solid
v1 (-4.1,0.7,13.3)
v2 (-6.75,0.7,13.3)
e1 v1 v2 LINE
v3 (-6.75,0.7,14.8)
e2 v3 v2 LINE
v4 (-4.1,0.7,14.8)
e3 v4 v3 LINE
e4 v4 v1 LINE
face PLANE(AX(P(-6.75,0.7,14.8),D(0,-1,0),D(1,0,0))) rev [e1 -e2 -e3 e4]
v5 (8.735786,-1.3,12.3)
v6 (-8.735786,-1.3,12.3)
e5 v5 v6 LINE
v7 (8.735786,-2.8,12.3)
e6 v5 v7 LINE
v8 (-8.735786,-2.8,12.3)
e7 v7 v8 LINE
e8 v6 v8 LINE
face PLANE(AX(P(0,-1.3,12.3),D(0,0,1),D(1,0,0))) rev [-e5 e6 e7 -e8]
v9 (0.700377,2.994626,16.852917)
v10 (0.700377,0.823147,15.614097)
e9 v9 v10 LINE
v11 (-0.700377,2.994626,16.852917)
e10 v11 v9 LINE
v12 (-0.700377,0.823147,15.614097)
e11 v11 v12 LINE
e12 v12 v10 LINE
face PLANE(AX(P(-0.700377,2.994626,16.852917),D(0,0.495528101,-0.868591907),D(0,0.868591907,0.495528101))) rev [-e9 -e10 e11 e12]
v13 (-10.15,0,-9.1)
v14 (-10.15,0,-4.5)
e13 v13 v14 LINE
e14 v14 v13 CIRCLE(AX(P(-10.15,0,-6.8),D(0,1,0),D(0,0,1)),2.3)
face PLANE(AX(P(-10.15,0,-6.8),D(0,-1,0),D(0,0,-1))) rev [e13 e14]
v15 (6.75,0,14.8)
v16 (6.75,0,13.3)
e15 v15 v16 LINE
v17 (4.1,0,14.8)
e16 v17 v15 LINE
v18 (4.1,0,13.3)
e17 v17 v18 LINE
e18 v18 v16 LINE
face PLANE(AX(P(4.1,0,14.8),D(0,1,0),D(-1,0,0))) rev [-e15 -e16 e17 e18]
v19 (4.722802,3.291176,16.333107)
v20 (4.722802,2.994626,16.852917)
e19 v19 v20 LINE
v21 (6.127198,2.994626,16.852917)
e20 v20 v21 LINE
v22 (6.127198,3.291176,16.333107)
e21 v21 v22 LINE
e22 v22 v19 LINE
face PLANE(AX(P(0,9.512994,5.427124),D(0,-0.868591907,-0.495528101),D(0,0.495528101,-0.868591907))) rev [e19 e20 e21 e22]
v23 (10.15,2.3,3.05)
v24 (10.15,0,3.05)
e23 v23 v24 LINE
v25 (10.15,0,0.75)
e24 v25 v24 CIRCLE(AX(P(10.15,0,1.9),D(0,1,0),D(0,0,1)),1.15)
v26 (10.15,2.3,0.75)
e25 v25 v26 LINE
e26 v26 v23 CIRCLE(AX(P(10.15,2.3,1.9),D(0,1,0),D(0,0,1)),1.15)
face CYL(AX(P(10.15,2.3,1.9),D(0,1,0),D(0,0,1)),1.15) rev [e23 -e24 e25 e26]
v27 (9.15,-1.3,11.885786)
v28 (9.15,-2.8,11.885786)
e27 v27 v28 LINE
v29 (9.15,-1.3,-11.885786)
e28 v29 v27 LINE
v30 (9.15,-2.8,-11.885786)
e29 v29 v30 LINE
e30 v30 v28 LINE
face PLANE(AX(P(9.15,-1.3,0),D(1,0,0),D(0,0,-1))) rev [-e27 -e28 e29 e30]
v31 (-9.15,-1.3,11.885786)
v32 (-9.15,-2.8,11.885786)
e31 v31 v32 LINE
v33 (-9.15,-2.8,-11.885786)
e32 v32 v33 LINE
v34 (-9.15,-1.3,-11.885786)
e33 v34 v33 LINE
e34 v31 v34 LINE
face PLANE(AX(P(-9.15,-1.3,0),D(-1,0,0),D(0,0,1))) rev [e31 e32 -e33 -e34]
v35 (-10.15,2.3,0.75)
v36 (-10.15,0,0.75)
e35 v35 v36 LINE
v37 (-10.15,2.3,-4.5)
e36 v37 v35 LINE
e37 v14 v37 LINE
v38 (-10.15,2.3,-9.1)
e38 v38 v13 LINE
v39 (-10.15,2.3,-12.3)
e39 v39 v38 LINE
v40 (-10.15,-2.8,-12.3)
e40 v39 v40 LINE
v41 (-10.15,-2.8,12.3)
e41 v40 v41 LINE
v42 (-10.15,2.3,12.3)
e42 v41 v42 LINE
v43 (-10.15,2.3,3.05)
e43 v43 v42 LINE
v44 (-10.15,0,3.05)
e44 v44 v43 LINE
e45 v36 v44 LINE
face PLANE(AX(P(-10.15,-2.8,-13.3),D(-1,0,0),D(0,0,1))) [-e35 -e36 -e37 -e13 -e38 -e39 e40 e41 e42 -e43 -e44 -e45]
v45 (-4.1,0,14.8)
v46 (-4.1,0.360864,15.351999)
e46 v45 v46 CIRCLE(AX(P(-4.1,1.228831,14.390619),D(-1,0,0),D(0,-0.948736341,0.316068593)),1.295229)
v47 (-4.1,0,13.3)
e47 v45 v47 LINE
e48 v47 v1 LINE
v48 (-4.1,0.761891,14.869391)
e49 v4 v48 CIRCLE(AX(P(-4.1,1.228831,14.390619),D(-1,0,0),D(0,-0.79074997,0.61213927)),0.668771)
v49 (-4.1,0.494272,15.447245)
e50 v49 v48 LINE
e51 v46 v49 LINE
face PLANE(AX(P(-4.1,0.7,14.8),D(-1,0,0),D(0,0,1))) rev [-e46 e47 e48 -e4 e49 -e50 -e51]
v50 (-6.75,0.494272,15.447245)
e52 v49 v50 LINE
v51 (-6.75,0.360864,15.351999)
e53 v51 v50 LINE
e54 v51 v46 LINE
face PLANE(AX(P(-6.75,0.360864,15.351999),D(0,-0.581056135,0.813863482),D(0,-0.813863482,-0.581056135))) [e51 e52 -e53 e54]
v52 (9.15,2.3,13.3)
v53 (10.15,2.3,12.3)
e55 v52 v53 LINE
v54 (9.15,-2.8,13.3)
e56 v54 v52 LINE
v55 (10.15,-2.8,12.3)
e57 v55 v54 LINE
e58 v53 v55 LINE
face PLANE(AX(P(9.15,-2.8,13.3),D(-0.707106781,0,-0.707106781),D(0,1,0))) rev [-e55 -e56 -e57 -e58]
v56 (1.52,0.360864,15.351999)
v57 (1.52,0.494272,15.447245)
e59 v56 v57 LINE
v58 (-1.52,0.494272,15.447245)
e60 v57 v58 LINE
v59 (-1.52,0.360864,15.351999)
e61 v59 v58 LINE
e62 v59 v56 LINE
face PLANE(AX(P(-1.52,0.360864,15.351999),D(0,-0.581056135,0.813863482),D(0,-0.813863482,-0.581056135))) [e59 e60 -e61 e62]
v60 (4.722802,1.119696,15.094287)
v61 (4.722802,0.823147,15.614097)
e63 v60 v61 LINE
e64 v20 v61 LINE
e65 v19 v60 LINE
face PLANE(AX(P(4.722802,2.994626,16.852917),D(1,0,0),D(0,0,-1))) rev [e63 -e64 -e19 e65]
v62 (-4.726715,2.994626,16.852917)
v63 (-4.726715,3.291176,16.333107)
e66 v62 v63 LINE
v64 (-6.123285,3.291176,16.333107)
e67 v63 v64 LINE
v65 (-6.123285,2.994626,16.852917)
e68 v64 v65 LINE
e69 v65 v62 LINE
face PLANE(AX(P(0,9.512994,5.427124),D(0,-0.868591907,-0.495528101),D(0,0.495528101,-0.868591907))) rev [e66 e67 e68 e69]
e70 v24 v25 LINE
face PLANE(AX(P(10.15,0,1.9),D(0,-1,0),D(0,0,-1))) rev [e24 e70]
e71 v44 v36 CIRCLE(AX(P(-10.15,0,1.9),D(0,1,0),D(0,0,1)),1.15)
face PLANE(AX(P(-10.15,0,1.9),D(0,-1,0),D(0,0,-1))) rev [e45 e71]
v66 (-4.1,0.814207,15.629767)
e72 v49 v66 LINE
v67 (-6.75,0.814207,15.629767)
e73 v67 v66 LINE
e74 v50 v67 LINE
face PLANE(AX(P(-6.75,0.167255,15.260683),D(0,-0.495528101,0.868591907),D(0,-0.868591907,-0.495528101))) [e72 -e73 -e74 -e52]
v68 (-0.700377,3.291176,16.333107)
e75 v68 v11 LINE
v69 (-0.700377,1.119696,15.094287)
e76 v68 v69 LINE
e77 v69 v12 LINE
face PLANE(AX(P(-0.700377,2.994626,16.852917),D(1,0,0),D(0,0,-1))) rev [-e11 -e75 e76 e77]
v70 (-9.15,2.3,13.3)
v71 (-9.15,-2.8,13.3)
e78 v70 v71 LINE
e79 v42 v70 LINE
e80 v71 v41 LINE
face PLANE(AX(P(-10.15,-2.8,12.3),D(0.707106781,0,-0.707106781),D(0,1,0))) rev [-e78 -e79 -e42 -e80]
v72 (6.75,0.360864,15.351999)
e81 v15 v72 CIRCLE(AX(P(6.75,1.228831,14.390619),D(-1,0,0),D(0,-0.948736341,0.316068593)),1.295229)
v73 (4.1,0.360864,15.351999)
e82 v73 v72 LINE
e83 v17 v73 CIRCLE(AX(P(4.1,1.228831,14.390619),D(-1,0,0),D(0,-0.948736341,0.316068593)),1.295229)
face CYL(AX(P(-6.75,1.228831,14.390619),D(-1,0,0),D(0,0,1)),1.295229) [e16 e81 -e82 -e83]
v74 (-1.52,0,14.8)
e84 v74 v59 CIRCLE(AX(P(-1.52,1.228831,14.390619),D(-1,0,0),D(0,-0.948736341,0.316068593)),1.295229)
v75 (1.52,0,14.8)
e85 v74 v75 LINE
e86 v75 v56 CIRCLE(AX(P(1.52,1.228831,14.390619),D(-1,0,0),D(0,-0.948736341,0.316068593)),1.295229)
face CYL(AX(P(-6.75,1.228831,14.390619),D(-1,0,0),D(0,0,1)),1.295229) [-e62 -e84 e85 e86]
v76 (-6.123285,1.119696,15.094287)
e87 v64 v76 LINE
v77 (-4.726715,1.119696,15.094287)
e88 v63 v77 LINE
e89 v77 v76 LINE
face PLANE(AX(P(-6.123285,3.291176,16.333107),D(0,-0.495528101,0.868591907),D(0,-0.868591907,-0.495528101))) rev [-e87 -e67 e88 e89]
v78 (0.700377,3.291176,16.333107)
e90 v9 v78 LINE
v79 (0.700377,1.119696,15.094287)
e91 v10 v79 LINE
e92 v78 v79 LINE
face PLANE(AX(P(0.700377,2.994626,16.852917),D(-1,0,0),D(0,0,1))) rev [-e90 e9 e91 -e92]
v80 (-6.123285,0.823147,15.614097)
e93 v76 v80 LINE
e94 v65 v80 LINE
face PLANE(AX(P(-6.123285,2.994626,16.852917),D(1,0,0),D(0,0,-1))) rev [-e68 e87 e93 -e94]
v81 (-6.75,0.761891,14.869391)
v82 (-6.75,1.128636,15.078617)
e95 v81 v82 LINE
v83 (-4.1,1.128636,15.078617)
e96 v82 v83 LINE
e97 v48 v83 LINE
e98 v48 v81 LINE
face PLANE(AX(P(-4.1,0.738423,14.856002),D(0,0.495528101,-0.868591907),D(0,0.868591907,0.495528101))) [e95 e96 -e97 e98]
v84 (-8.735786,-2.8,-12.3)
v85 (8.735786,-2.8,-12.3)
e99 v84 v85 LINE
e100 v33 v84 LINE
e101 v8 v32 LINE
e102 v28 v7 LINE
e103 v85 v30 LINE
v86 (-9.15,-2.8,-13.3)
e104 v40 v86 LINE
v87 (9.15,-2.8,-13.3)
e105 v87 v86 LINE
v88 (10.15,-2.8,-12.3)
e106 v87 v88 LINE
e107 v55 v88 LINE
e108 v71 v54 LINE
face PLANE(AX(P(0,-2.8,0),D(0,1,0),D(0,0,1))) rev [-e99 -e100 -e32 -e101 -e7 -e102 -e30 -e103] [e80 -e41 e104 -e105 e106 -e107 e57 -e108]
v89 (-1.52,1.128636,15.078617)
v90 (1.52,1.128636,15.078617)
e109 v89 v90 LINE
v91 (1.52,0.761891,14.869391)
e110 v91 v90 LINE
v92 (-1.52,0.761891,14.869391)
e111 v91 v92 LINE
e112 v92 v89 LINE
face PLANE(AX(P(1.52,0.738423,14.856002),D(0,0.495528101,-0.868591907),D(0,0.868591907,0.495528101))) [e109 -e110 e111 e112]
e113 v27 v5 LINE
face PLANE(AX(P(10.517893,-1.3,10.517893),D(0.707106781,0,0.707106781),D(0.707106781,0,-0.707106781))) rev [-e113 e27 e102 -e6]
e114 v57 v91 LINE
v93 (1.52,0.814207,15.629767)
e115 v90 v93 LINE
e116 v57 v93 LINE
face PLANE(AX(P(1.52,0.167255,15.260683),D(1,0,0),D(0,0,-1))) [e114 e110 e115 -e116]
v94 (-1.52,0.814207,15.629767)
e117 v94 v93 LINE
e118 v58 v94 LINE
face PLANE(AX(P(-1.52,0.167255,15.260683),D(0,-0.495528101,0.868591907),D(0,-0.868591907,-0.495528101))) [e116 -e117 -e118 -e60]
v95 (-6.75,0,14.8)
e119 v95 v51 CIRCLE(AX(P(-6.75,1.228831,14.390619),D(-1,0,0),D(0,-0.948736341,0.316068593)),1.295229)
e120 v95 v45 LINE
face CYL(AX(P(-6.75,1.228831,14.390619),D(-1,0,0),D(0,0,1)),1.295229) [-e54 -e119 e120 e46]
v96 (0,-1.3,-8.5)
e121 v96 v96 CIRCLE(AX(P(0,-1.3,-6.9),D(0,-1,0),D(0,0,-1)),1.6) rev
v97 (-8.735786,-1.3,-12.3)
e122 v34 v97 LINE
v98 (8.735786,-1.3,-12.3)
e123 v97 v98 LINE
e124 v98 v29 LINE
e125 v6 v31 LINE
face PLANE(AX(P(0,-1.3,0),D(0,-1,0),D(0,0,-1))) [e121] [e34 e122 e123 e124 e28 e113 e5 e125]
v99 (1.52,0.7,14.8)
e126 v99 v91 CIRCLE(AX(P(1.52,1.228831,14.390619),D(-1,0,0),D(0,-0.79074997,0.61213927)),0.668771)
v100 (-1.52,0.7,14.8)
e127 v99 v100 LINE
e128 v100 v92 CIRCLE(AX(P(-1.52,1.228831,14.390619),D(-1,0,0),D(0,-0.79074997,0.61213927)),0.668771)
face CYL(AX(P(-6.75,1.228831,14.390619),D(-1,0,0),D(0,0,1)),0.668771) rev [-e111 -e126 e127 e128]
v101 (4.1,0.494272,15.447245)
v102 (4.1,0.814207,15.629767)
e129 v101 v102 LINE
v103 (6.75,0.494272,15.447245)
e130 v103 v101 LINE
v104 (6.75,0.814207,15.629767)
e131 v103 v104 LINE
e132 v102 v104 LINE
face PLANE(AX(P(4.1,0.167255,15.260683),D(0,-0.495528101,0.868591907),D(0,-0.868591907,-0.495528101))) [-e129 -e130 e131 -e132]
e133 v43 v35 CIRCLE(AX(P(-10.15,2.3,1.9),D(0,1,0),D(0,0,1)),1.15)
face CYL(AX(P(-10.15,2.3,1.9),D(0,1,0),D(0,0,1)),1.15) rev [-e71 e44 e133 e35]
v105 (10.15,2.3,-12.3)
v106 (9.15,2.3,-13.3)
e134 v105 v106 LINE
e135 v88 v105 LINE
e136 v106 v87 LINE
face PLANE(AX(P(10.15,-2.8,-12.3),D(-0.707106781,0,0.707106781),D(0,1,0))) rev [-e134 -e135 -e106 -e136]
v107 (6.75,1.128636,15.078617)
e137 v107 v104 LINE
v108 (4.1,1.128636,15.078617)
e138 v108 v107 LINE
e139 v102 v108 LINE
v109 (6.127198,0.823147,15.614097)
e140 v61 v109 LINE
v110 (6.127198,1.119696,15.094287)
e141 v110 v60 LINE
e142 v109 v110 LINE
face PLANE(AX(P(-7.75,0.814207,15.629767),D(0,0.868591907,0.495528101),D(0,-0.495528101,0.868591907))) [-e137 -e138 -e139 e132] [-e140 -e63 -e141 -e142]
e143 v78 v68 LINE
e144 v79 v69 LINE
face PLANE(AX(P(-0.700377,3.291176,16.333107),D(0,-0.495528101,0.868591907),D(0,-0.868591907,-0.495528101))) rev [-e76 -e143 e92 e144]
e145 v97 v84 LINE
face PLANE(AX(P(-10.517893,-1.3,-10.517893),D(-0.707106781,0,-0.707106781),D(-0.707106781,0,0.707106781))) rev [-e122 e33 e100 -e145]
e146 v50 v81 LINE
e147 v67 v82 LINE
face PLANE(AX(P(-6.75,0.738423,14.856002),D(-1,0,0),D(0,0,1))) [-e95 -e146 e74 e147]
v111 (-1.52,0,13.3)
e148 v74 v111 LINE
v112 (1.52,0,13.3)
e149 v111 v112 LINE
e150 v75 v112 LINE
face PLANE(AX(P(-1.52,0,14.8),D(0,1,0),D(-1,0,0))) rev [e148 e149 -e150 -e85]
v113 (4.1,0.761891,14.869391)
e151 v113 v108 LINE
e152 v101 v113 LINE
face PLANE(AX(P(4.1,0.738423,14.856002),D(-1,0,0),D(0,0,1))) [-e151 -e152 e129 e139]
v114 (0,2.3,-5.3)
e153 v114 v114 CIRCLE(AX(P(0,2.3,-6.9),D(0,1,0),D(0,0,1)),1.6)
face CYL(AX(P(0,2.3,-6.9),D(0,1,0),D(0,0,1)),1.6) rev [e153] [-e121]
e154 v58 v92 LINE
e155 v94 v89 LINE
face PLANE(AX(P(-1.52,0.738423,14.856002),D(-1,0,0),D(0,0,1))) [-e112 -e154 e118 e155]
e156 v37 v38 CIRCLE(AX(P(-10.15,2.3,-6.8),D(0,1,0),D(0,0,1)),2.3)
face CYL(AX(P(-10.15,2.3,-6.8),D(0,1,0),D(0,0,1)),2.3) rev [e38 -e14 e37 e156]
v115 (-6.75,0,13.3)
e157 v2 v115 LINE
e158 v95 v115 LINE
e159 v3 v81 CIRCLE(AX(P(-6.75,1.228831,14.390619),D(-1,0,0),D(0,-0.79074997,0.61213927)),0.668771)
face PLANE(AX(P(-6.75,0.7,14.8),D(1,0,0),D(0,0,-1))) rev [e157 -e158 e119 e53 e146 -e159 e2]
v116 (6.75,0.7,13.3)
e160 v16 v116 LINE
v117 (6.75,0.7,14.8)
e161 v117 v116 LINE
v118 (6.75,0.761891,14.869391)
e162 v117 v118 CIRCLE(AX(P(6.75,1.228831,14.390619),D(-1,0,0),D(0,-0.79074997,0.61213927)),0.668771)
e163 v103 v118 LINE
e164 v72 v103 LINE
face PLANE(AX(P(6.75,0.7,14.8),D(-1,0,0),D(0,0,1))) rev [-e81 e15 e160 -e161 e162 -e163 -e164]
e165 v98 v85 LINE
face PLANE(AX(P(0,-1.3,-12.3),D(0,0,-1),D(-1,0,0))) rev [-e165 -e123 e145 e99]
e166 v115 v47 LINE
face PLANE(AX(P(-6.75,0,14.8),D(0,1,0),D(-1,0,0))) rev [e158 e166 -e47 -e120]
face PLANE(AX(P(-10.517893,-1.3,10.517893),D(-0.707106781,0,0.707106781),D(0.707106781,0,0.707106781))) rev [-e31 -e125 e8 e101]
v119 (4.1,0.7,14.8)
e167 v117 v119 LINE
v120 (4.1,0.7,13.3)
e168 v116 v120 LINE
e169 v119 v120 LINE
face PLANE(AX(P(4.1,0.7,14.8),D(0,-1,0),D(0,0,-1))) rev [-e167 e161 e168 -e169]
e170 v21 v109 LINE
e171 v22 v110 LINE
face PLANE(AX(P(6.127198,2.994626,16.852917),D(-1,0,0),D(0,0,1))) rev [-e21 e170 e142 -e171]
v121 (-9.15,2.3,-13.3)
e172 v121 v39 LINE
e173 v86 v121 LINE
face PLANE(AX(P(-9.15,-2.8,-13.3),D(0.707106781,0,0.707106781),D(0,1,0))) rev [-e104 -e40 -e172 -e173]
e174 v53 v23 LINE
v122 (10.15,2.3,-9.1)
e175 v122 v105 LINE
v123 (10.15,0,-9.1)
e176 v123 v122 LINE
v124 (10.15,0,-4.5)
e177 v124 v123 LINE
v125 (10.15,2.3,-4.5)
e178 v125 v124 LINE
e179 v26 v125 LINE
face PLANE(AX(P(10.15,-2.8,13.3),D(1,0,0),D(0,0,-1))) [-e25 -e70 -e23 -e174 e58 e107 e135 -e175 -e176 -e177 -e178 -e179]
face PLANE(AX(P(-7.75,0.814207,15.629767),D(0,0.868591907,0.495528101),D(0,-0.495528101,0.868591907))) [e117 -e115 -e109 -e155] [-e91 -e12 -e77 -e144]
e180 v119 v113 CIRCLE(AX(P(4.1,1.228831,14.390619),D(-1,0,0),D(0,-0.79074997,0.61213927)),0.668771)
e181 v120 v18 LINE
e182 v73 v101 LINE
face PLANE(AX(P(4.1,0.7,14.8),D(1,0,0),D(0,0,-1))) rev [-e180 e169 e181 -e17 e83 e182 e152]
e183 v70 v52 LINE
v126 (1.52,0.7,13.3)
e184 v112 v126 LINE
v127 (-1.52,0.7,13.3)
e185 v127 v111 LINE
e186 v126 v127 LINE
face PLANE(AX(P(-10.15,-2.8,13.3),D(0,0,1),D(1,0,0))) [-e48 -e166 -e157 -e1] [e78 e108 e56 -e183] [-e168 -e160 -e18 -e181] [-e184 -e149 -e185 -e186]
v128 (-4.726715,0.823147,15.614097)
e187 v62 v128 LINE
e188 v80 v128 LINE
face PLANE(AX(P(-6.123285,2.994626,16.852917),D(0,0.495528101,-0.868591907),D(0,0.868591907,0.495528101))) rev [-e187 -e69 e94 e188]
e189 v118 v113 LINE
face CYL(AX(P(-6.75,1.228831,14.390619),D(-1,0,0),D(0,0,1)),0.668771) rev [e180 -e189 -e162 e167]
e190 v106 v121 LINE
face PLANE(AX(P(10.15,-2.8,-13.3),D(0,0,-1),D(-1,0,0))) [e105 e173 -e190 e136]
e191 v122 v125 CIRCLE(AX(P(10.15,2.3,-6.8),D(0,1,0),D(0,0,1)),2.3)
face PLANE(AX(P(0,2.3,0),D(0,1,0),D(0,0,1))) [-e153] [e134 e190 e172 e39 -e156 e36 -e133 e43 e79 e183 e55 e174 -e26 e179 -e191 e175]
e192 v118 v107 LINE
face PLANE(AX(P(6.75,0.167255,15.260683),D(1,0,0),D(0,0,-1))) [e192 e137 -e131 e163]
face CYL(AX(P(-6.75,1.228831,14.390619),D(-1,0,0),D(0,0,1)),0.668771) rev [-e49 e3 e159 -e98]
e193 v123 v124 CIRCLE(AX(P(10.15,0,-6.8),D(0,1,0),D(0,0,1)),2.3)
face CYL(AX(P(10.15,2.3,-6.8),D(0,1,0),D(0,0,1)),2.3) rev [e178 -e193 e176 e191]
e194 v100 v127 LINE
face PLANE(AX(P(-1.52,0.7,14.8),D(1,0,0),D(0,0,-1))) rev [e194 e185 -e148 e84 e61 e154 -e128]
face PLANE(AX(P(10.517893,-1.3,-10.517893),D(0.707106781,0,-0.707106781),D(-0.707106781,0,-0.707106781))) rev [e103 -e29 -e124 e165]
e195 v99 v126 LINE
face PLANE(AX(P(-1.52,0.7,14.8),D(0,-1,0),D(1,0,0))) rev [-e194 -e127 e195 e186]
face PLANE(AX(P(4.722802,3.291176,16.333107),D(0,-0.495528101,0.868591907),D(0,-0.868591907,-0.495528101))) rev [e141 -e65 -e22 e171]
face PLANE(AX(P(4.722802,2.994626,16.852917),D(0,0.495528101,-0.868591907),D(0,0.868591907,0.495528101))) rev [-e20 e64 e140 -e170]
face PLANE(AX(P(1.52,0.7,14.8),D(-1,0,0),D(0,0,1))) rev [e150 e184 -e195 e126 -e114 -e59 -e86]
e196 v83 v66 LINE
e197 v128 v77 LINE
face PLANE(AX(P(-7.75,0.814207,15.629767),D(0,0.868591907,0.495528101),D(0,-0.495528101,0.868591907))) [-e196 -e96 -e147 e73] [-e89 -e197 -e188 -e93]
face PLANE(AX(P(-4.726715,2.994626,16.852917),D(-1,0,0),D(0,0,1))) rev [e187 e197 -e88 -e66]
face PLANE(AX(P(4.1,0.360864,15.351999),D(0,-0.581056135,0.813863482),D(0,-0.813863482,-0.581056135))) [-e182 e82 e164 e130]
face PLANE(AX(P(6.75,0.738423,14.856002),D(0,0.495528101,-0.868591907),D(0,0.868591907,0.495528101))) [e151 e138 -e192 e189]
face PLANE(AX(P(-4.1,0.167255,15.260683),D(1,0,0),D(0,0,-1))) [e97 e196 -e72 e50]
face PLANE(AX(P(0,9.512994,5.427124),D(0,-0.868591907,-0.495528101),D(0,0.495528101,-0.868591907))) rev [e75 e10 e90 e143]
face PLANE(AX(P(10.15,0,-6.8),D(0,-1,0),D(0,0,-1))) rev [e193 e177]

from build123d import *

# Parameters (mm, degrees)
SKETCH_1_W                  = 20.3
SKETCH_1_H                  = 26.6
EXTRUDE_1_DEPTH             = 5.1
HOLE_WIZARD_3_2_3_2_1_D     = 3.2
HOLE_WIZARD_2_3_2_3_1_D     = 2.3
HOLE_WIZARD_2_3_2_3_1_DEPTH = 2.3
HOLE_WIZARD_4_6_4_6_1_D     = 4.6
HOLE_WIZARD_4_6_4_6_1_DEPTH = 2.3
CHAMFER_1_SIZE              = 1
SKETCH_20_R                 = 1.6
CUT_EXTRUDE_7_DEPTH         = 1.5
SKETCH_2_W                  = 2.65
SKETCH_2_H                  = 0.7
SKETCH_2_W_2                = 3.04
EXTRUDE_2_DEPTH             = 1.5
SWEEP_START                 = -6.75
SWEEP_1_DEPTH               = 2.65
SWEEP_START_2               = -1.52
SWEEP_2_DEPTH               = 3.04
SWEEP_START_3               = 4.1
SWEEP_3_DEPTH               = 2.65
CUT_EXTRUDE_8_DEPTH         = 1
CUT_EXTRUDE_8_DEPTH_BACK    = 15.5
SKETCH_25_W                 = 1.3965698
SKETCH_25_H                 = 0.598451561
SKETCH_25_W_2               = 1.400753048
SKETCH_25_W_3               = 1.404395486
EXTRUDE_3_DEPTH             = 2.5


# Read off the part's stored shape, not the designer's step: По траектории1, По траектории2, По траектории3
with BuildPart() as part:
    # Эскиз1 → Бобышка-Вытянуть1 (new body)
    with BuildSketch(Plane(origin=(0, 2.3, 0), x_dir=(1, 0, 0), z_dir=(0, 1, 0))):
        Rectangle(SKETCH_1_W, SKETCH_1_H)
    extrude(amount=-EXTRUDE_1_DEPTH)

    # Диаметр отверстия Ø3.2 (3.2)1 (through all)
    with Locations(Plane(origin=(0, 2.3, 0), x_dir=(1, 0, 0), z_dir=(0, 1, 0))):
        with Locations((0, 6.9)):
            Hole(HOLE_WIZARD_3_2_3_2_1_D / 2)

    # Диаметр отверстия Ø2.3 (2.3)1
    with Locations(Plane(origin=(0, 2.3, 0), x_dir=(1, 0, 0), z_dir=(0, 1, 0))):
        with Locations((10.15, -1.9), (-10.15, -1.9)):
            Hole(HOLE_WIZARD_2_3_2_3_1_D / 2, depth=HOLE_WIZARD_2_3_2_3_1_DEPTH)

    # Диаметр отверстия Ø4.6 (4.6)1
    with Locations(Plane(origin=(0, 2.3, 0), x_dir=(1, 0, 0), z_dir=(0, 1, 0))):
        with Locations((10.15, 6.8), (-10.15, 6.8)):
            Hole(HOLE_WIZARD_4_6_4_6_1_D / 2, depth=HOLE_WIZARD_4_6_4_6_1_DEPTH)

    # Фаска1
    chamfer_1_edges = [part.edges().sort_by_distance(p)[0] for p in [
        (-10.15, -0.25, -13.3),
        (10.15, -0.25, -13.3),
        (10.15, -0.25, 13.3),
        (-10.15, -0.25, 13.3),
    ]]
    chamfer(chamfer_1_edges, length=CHAMFER_1_SIZE)

    # Эскиз20 → Вырез-Вытянуть7 (cut)
    with BuildSketch(Plane.XZ.offset(2.8)):
        Polygon((-8.735786438, -12.3), (8.735786438, -12.3), (9.15, -11.885786438), (9.15, 11.885786438), (8.735786438, 12.3), (-8.735786438, 12.3), (-9.15, 11.885786438), (-9.15, -11.885786438), align=None)
        with Locations(Location((0, -6.9, 0), (0, 0, 90))):
            Circle(SKETCH_20_R, mode=Mode.SUBTRACT)
    extrude(amount=-CUT_EXTRUDE_7_DEPTH, mode=Mode.SUBTRACT)

    # Эскиз2 → Бобышка-Вытянуть2 (add)
    with BuildSketch(Plane.XY.offset(13.3)):
        with Locations((-5.425, 0.35)):
            Rectangle(SKETCH_2_W, SKETCH_2_H)
        with Locations((0, 0.35)):
            Rectangle(SKETCH_2_W_2, SKETCH_2_H)
        with Locations((5.425, 0.35)):
            Rectangle(SKETCH_2_W, SKETCH_2_H)
    extrude(amount=EXTRUDE_2_DEPTH)

    # По траектории1 outline → По траектории1 (add)
    with BuildSketch(Plane.YZ.offset(SWEEP_START)):
        with BuildLine():
            Line((0.761891294, 14.869390662), (1.385375103, 15.225085604))
            Line((1.385375103, 15.225085604), (0.81420695, 15.629766886))
            Line((0.81420695, 15.629766886), (0.494271743, 15.44724517))
            Line((0.494271743, 15.44724517), (0.36086417, 15.351999112))
            ThreePointArc((0.36086417, 15.351999112), (0.144711062, 15.099351835), (0, 14.8))
            Line((0, 14.8), (0.7, 14.8))
            ThreePointArc((0.7, 14.8), (0.729738232, 14.835772255), (0.761891294, 14.869390662))
        make_face()
    extrude(amount=SWEEP_1_DEPTH)

    # По траектории2 outline → По траектории2 (add)
    with BuildSketch(Plane.YZ.offset(SWEEP_START_2)):
        with BuildLine():
            Line((0.761891294, 14.869390662), (1.385375103, 15.225085604))
            Line((1.385375103, 15.225085604), (0.81420695, 15.629766886))
            Line((0.81420695, 15.629766886), (0.494271743, 15.44724517))
            Line((0.494271743, 15.44724517), (0.36086417, 15.351999112))
            ThreePointArc((0.36086417, 15.351999112), (0.144711062, 15.099351835), (0, 14.8))
            Line((0, 14.8), (0.7, 14.8))
            ThreePointArc((0.7, 14.8), (0.729738232, 14.835772255), (0.761891294, 14.869390662))
        make_face()
    extrude(amount=SWEEP_2_DEPTH)

    # По траектории3 outline → По траектории3 (add)
    with BuildSketch(Plane.YZ.offset(SWEEP_START_3)):
        with BuildLine():
            Line((0.761891294, 14.869390662), (1.385375103, 15.225085604))
            Line((1.385375103, 15.225085604), (0.81420695, 15.629766886))
            Line((0.81420695, 15.629766886), (0.494271743, 15.44724517))
            Line((0.494271743, 15.44724517), (0.36086417, 15.351999112))
            ThreePointArc((0.36086417, 15.351999112), (0.144711062, 15.099351835), (0, 14.8))
            Line((0, 14.8), (0.7, 14.8))
            ThreePointArc((0.7, 14.8), (0.729738232, 14.835772255), (0.761891294, 14.869390662))
        make_face()
    extrude(amount=SWEEP_3_DEPTH)

    # Эскиз24 → Вырез-Вытянуть8 (cut, two sides: drawn at the far end of the back side and taken through both)
    with BuildSketch(Plane.ZY.offset(6.75).offset(-CUT_EXTRUDE_8_DEPTH_BACK)):
        Polygon((15.629766886, 0.81420695), (15.0115294, 1.166908885), (15.187532371, 1.475417638), (15.841474348, 1.102346438), (15.665471376, 0.793837685), align=None)
    extrude(amount=CUT_EXTRUDE_8_DEPTH + CUT_EXTRUDE_8_DEPTH_BACK, mode=Mode.SUBTRACT)

    # Эскиз25 → Бобышка-Вытянуть3 (add)
    with BuildSketch(Plane(origin=(0, 7.341514488, 4.188303737), x_dir=(1, 0, 0), z_dir=(0, 0.8685919072443863, 0.49552810078698817))):
        with Locations((-5.425, -12.855160228)):
            Rectangle(SKETCH_25_W, SKETCH_25_H)
        with Locations((0, -12.855160228)):
            Rectangle(SKETCH_25_W_2, SKETCH_25_H)
        with Locations((5.425, -12.855160228)):
            Rectangle(SKETCH_25_W_3, SKETCH_25_H)
    extrude(amount=EXTRUDE_3_DEPTH)


solid = part.part
